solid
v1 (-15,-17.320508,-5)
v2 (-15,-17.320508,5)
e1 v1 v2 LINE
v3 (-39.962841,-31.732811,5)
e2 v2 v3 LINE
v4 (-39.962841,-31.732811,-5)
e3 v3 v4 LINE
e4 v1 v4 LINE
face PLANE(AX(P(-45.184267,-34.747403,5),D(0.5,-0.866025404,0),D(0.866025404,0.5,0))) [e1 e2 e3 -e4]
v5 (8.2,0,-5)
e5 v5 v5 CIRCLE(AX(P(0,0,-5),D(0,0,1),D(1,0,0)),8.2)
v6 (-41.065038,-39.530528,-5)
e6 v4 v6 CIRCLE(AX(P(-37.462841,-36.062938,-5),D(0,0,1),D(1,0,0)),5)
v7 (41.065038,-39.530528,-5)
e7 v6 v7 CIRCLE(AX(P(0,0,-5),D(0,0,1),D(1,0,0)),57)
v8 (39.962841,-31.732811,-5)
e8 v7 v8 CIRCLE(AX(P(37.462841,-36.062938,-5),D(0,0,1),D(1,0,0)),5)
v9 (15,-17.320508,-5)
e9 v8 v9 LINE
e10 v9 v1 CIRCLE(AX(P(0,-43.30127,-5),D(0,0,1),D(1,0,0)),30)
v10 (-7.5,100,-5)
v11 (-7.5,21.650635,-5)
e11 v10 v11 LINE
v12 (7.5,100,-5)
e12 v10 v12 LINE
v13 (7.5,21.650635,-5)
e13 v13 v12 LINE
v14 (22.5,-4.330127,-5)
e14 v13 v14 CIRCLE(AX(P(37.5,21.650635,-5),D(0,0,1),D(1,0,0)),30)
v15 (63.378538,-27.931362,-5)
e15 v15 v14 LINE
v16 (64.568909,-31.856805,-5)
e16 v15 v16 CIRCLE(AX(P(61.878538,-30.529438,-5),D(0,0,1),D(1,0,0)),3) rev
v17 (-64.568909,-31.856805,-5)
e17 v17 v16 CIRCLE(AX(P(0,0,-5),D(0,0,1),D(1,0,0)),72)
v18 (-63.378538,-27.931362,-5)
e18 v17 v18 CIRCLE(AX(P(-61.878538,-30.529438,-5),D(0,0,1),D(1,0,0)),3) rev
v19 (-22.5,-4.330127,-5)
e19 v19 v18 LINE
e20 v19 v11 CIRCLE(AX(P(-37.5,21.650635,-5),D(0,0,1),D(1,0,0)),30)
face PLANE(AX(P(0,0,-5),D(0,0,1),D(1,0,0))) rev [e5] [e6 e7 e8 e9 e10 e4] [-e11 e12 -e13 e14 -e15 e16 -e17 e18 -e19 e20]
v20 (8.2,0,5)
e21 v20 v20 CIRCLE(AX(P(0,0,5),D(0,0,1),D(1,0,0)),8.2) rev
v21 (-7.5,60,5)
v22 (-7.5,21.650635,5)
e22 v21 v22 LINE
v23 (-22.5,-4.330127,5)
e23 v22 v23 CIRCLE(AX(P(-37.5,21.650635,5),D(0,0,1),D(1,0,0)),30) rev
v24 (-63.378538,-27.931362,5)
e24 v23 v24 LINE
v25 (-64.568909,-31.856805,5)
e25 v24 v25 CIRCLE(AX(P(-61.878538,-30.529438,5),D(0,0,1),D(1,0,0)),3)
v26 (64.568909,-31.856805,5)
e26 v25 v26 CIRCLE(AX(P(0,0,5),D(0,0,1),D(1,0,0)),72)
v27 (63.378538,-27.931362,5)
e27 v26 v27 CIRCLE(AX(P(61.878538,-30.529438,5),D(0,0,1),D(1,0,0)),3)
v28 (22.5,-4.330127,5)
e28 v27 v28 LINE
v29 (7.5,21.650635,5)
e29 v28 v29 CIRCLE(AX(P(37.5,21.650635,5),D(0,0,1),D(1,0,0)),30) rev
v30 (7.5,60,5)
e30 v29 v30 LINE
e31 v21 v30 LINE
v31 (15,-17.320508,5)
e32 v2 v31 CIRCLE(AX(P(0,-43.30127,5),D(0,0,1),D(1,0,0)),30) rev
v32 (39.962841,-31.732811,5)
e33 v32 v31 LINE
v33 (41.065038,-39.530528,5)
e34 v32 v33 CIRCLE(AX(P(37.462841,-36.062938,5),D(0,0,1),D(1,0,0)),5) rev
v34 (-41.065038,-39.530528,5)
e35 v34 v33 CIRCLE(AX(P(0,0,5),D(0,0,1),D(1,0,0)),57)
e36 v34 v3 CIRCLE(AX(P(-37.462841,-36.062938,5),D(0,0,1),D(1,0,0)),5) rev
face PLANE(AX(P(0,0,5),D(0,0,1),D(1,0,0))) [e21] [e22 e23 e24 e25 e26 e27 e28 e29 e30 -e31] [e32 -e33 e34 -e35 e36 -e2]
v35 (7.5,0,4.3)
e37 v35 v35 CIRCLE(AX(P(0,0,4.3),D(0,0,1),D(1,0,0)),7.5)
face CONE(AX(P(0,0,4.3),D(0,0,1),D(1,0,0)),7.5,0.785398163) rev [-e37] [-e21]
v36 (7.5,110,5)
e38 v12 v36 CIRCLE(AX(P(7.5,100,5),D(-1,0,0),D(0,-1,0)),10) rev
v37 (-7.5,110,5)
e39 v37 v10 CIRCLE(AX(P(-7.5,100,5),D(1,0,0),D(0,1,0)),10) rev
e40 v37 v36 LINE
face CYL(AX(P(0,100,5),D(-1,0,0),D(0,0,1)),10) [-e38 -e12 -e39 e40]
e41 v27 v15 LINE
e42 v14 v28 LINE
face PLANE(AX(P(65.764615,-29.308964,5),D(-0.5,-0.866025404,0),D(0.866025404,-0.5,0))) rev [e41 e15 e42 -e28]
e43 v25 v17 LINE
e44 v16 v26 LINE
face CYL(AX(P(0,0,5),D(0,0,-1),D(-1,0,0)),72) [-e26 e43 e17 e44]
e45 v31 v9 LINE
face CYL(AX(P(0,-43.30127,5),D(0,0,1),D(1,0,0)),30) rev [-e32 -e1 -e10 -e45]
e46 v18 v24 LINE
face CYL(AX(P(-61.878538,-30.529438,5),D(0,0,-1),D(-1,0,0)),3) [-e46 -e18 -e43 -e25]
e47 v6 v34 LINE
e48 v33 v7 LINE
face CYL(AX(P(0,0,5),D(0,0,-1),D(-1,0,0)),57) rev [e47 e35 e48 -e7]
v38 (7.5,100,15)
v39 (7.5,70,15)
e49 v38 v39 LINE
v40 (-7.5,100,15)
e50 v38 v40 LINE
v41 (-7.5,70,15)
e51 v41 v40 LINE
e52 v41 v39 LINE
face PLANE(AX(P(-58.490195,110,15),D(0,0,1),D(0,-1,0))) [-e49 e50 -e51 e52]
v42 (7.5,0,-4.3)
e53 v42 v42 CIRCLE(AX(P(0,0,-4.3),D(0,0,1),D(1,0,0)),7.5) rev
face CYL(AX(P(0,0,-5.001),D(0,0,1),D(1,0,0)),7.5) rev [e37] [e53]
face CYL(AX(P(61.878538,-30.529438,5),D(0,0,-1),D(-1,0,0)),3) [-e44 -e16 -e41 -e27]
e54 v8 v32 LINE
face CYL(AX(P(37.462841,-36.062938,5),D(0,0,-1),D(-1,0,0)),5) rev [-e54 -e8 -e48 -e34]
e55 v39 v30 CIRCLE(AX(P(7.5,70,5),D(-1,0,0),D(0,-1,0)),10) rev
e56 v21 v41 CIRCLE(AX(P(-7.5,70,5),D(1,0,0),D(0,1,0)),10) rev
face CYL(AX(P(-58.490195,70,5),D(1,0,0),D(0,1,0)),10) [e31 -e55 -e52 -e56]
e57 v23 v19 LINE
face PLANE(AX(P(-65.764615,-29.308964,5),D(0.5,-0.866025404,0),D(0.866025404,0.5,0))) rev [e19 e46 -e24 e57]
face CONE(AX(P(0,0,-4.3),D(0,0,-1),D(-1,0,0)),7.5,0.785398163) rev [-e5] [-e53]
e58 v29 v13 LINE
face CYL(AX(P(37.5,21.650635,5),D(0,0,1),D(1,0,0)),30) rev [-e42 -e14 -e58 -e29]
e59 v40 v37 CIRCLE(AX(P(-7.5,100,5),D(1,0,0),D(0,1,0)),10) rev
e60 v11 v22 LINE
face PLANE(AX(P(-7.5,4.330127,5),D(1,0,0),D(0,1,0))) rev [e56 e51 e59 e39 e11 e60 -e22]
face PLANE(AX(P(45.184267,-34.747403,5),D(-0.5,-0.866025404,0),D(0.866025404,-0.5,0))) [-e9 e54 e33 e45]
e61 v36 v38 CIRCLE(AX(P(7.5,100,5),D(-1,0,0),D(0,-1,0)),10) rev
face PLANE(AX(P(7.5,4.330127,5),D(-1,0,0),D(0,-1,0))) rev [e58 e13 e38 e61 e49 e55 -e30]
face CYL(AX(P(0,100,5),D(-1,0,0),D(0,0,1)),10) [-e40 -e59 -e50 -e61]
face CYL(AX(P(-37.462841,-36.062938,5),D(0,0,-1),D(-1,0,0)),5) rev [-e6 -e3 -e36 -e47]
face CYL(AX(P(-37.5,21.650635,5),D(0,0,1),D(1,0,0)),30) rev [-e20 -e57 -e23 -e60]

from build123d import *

# Parameters (mm, degrees)
EXTRUDE_1_DEPTH     = 5
FILLET_1_R          = 30
FILLET_2_R          = 5
SKETCH_9_W          = 10
SKETCH_9_H          = 50
EXTRUDE_3_DEPTH     = 15
FILLET_4_R          = 10
CUT_EXTRUDE_1_REACH = 130.55
SKETCH_10_R         = 7.5
CHAMFER_1_SIZE      = 0.7
FILLET_5_R          = 3


with BuildPart() as part:
    # 스케치2 → 보스-돌출1 (new, symmetric)
    with BuildSketch(Plane.XY):
        with BuildLine():
            Line((-65.764615213, -29.308964258), (-7.5, 4.330127019))
            Line((-7.5, 4.330127019), (-7.5, 110))
            Line((-7.5, 110), (0, 110))
            Line((0, 110), (7.5, 110))
            Line((7.5, 110), (7.5, 4.330127019))
            Line((7.5, 4.330127019), (65.764615213, -29.308964258))
            ThreePointArc((65.764615213, -29.308964258), (0, -72), (-65.764615213, -29.308964258))
        make_face()
        with BuildLine():
            Line((45.184267135, -34.747402831), (0, -8.660254038))
            Line((0, -8.660254038), (-45.184267135, -34.747402831))
            ThreePointArc((-45.184267135, -34.747402831), (0, -57), (45.184267135, -34.747402831))
        make_face(mode=Mode.SUBTRACT)
    extrude(amount=EXTRUDE_1_DEPTH, both=True)

    # 필렛1
    fillet_1_edges = [part.edges().sort_by_distance(p)[0] for p in [
        (-7.5, 4.330127019, 0),
        (7.5, 4.330127019, 0),
        (0, -8.660254038, 0),
    ]]
    fillet(fillet_1_edges, radius=FILLET_1_R)

    # 필렛2
    fillet_2_edges = [part.edges().sort_by_distance(p)[0] for p in [
        (-45.184267135, -34.747402831, 0),
        (45.184267135, -34.747402831, 0),
    ]]
    fillet(fillet_2_edges, radius=FILLET_2_R)

    # 스케치9 → 보스-돌출3 (add)
    with BuildSketch(Plane(origin=(7.5, 0, 0), x_dir=(0, 0, -1), z_dir=(1, 0, 0))):
        with Locations((-10, 85)):
            Rectangle(SKETCH_9_W, SKETCH_9_H)
    extrude(amount=-EXTRUDE_3_DEPTH)

    # 필렛4
    fillet_4_edges = [part.edges().sort_by_distance(p)[0] for p in [
        (0, 110, -5),
        (0, 110, 15),
        (0, 60, 15),
    ]]
    fillet(fillet_4_edges, radius=FILLET_4_R - 0.0001)  # a hair under: the kernel refuses the full size

    # 스케치10 → 컷-돌출1 (cut, up to next)
    with BuildSketch(Plane.XY.offset(5), mode=Mode.PRIVATE) as cut_extrude_1_sk1:
        Circle(SKETCH_10_R)
    cut_extrude_1_tool1 = extrude(cut_extrude_1_sk1.sketch, amount=-CUT_EXTRUDE_1_REACH, mode=Mode.PRIVATE) & part.part
    add(cut_extrude_1_tool1.solids().sort_by_distance((0, 0, 5))[0], mode=Mode.SUBTRACT)

    # 모따기1
    chamfer_1_edges = [part.edges().sort_by_distance(p)[0] for p in [
        (-7.5, 0, 5),
        (-7.5, 0, -5),
    ]]
    chamfer(chamfer_1_edges, length=CHAMFER_1_SIZE)

    # 필렛5
    fillet_5_edges = [part.edges().sort_by_distance(p)[0] for p in [
        (-65.764615213, -29.308964258, 0),
        (65.764615213, -29.308964258, 0),
    ]]
    fillet(fillet_5_edges, radius=FILLET_5_R)


solid = part.part
